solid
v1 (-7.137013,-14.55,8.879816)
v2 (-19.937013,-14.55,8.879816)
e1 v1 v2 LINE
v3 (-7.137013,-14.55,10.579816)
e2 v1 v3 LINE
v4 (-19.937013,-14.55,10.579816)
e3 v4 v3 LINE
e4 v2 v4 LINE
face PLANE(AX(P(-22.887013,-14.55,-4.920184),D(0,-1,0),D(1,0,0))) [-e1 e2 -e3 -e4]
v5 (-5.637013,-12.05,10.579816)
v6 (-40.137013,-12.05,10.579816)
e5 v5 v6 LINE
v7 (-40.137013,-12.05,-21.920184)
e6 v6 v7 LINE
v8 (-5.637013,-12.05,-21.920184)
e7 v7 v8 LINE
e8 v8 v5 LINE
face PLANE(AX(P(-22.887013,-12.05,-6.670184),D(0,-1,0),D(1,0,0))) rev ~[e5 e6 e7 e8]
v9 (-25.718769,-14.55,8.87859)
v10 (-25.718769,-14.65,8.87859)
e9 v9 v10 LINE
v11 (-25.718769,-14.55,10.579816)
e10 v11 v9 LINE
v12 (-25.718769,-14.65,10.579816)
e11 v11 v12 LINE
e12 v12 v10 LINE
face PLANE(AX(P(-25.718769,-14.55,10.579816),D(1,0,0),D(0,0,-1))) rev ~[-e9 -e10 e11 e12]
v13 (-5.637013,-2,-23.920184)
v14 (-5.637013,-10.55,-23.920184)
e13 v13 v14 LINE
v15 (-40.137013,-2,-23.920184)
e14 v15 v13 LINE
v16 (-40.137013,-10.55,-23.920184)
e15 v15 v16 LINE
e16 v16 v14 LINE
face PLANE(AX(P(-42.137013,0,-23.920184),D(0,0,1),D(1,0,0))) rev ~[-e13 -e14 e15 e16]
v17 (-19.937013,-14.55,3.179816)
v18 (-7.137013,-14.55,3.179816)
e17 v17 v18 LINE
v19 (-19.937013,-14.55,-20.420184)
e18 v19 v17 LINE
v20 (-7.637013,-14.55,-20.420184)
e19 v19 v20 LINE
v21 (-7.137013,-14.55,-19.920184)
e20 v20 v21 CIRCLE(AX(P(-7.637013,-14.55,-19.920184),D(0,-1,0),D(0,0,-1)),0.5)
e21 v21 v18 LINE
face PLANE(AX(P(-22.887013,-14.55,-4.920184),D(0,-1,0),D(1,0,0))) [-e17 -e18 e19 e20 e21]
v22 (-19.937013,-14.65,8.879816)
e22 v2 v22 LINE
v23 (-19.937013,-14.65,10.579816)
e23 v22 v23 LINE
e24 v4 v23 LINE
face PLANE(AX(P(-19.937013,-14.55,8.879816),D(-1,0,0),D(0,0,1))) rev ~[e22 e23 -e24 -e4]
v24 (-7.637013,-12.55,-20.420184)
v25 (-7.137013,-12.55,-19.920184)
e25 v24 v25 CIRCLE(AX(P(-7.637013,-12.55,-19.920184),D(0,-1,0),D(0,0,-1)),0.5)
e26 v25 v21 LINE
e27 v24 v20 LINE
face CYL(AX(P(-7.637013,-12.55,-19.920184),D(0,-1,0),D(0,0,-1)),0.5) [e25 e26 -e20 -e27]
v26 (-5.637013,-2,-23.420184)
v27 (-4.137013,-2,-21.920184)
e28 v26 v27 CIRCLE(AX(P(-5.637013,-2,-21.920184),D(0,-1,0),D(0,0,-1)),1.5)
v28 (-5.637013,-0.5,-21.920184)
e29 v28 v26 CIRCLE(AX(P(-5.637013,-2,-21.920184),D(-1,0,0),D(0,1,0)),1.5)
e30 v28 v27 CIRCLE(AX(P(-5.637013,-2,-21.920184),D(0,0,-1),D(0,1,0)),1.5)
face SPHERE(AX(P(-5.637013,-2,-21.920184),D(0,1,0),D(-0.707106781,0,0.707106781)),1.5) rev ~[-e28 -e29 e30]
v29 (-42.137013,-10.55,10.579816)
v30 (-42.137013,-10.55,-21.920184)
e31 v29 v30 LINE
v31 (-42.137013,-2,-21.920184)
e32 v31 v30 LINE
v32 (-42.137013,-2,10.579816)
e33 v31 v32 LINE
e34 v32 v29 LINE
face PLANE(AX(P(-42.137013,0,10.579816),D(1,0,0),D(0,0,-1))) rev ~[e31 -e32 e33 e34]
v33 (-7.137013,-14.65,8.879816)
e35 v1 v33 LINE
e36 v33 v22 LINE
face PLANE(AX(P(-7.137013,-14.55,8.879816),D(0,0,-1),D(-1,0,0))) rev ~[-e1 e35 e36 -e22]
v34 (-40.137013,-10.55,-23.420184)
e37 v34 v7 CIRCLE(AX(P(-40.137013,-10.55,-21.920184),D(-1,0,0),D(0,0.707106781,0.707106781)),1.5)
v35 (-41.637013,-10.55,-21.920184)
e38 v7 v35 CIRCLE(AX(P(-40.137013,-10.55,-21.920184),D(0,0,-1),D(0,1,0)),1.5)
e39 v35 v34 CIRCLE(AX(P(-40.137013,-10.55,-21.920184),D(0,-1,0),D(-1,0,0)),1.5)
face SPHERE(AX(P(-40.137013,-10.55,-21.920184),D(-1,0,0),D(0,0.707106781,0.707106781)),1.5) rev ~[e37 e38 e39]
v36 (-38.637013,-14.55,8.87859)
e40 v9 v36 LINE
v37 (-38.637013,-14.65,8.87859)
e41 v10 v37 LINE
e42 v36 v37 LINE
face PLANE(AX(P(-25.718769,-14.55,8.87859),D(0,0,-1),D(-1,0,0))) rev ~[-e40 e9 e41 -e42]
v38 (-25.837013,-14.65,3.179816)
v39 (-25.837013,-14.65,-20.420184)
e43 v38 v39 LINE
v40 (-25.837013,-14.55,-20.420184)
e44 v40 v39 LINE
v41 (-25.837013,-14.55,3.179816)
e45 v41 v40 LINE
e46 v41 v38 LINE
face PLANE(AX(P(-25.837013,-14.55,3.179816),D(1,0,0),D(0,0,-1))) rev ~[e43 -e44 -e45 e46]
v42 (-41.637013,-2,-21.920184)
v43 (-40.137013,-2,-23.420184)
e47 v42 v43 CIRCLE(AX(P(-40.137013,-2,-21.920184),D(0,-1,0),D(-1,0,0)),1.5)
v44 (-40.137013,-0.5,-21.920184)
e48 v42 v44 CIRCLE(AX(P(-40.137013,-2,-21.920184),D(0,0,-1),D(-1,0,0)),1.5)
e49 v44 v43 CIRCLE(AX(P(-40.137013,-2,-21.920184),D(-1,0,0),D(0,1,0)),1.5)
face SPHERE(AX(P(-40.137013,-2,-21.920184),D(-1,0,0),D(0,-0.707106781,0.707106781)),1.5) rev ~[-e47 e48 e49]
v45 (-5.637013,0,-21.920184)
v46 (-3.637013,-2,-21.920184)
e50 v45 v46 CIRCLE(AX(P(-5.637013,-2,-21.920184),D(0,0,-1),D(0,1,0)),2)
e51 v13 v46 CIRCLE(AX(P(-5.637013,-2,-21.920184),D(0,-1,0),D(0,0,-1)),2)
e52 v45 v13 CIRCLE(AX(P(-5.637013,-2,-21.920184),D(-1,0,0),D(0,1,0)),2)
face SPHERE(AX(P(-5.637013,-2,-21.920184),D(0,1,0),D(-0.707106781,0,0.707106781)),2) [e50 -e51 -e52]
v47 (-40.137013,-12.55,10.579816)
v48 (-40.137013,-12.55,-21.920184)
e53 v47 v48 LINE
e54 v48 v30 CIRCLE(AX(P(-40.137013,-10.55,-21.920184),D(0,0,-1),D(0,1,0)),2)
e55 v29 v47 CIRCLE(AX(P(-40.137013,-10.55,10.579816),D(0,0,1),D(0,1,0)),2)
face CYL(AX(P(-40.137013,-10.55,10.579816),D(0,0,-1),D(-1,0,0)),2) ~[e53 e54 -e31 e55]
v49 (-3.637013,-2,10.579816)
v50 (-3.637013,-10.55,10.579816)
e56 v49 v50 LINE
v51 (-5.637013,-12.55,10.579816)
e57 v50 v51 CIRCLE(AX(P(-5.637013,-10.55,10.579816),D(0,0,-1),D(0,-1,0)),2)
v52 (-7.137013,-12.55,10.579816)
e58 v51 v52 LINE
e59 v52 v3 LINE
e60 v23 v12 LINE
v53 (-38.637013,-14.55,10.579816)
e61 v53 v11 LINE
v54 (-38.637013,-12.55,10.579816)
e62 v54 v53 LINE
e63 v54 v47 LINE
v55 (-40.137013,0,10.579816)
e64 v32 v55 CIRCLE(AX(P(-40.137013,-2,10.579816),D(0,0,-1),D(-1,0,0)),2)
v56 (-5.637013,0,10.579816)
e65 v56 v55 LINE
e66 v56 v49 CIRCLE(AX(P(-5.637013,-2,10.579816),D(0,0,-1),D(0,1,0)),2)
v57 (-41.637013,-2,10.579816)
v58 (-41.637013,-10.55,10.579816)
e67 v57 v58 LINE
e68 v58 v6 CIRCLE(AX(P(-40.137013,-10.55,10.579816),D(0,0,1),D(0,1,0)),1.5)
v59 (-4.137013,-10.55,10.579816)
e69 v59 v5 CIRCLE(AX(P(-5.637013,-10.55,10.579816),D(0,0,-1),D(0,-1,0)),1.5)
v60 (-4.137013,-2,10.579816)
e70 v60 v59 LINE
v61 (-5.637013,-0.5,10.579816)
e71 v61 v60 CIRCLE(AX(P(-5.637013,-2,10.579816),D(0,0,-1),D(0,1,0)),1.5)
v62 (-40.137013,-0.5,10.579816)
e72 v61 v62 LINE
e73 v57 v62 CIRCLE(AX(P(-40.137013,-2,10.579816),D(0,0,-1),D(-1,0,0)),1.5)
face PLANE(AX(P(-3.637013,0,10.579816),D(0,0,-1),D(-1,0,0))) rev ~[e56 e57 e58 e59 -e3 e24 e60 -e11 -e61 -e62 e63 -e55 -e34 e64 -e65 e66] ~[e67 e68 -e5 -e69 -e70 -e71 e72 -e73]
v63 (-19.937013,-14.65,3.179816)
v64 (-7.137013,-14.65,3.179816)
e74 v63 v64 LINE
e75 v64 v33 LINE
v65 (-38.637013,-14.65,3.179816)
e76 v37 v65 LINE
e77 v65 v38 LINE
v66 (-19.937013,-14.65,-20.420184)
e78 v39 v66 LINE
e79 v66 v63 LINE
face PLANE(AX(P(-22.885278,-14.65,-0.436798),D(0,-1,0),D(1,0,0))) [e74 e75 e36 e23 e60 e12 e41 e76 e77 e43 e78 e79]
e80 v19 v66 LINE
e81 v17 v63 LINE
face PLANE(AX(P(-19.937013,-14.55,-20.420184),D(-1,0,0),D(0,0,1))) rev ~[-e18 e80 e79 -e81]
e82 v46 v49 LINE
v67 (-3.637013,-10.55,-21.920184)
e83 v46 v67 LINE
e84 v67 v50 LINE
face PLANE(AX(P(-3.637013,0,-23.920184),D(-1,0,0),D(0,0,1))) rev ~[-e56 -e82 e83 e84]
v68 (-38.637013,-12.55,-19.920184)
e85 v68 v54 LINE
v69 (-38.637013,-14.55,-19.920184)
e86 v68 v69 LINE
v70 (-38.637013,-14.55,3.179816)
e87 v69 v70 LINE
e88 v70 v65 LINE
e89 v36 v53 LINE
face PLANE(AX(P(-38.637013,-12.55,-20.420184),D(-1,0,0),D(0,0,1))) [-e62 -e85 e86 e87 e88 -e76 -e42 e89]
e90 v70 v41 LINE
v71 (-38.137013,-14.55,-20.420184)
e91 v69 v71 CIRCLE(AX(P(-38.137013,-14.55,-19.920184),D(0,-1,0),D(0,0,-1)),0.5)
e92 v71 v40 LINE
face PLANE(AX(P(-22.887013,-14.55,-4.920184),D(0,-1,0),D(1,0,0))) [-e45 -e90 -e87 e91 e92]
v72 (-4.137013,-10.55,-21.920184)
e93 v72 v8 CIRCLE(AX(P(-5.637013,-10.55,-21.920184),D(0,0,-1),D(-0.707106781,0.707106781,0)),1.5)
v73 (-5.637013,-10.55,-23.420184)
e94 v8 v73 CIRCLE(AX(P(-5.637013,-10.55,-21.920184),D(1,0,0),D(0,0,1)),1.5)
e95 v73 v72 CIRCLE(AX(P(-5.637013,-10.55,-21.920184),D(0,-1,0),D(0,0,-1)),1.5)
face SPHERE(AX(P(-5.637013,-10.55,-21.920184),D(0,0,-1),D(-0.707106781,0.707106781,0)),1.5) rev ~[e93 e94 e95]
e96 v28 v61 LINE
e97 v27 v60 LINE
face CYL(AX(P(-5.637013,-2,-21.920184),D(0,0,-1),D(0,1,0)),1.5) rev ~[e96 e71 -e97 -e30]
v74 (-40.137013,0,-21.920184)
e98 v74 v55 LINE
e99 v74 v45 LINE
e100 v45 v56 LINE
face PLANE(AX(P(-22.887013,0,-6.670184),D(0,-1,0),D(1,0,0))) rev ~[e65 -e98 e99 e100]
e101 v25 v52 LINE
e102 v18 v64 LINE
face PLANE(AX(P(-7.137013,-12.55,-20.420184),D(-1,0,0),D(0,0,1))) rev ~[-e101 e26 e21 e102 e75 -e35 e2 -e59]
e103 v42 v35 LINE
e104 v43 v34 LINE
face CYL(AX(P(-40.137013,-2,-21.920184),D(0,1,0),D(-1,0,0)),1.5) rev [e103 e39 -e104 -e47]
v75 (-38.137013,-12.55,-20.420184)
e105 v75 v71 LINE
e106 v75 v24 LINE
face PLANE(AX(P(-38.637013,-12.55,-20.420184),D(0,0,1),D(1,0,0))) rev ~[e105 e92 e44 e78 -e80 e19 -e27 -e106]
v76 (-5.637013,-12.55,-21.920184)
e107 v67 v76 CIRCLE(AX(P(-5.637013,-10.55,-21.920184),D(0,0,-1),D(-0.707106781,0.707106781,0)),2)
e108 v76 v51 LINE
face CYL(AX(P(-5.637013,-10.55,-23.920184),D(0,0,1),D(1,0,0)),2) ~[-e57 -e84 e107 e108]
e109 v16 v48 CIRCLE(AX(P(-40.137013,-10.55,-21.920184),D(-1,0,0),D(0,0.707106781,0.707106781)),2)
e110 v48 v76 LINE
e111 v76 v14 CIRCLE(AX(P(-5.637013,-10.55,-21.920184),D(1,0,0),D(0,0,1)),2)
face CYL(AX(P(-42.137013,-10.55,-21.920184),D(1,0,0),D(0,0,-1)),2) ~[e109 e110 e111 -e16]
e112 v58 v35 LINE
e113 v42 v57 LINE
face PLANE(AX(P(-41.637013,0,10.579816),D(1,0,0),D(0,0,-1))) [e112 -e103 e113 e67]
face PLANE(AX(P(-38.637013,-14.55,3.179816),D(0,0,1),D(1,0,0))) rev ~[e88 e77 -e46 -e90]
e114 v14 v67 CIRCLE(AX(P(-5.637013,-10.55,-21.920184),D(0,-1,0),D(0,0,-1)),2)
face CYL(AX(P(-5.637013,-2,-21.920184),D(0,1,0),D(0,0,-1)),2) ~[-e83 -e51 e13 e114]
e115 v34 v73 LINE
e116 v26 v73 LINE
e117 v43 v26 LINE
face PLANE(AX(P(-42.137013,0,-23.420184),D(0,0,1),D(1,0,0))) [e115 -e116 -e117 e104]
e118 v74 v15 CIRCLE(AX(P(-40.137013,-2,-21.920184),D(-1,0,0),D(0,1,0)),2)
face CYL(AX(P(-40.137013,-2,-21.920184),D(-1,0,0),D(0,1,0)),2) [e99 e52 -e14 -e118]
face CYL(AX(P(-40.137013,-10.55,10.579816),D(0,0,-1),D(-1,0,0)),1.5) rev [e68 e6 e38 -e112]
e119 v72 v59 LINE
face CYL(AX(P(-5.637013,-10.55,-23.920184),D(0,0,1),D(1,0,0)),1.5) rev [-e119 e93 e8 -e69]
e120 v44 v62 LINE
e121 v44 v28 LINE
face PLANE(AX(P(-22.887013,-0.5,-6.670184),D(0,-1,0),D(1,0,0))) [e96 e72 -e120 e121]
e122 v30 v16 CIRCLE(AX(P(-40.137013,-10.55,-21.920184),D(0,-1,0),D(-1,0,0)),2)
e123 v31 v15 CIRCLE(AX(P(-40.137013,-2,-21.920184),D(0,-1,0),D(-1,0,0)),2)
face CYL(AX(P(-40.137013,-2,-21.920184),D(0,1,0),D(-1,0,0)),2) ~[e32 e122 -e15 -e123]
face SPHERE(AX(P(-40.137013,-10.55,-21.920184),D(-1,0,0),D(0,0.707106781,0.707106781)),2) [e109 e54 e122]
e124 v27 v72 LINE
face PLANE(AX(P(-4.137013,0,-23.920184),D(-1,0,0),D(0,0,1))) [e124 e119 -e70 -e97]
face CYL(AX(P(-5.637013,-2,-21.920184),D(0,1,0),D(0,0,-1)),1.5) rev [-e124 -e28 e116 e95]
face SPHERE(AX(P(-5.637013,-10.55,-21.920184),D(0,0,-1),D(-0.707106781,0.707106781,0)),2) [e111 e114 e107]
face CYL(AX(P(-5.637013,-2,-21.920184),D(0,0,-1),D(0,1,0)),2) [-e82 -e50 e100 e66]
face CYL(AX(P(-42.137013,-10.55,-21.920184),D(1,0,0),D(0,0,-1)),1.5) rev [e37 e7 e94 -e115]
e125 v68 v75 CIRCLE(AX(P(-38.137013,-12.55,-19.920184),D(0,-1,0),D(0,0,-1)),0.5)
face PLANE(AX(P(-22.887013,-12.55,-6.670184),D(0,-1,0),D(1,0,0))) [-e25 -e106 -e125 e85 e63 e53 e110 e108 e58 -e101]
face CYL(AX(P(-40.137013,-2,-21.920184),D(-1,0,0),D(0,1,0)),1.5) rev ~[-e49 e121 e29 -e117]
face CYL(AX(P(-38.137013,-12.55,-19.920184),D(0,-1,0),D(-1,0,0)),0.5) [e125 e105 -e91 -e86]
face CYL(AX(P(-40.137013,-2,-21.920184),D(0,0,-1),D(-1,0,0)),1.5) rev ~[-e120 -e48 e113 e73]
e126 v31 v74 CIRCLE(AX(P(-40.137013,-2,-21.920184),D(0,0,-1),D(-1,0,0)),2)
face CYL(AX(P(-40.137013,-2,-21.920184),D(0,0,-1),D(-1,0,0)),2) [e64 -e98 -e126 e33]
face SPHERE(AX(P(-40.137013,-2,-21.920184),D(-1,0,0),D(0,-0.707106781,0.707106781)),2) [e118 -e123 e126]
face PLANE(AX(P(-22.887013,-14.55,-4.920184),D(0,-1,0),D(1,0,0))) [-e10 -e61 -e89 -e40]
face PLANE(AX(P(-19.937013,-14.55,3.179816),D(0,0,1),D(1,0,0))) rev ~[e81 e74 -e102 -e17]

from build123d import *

# Parameters (mm, degrees)
F1_DEPTH     = 12.55
F2_R         = 2
F3_T1_DEPTH  = 37.5
F3_T3_DEPTH  = 8.55
F3_T5_DEPTH  = 34.5
F3_S9_W      = 2
F3_S9_H      = 2
F3_T10_DEPTH = 2
F3_S15_W     = 2
F3_S15_H     = 2
F3_T16_DEPTH = 2
F3_S21_W     = 2
F3_S21_H     = 2
F3_T22_DEPTH = 2
F3_S27_W     = 2
F3_S27_H     = 2
F3_T28_DEPTH = 2
F4_T         = -0.5
F6_W         = 31.5
F6_H         = 31
F7_DEPTH     = 2
F8_R         = 0.5
F10_DEPTH    = 0.1


# Not quite as in the source:
# - a fillet or chamfer that OpenCascade refuses, or shapes differently, is made with other operations: its cross-section is extruded or revolved along the edge and cut away or added


with BuildPart() as f1:
    # F0 (on Front) → F1 (new body)
    with BuildSketch(Plane.XZ):
        Polygon((-42.1370128049, 10.5798164573), (-42.1370128049, -23.9201835427), (-3.6370128049, -23.9201835427), (-3.6370128049, 10.5798164573), (-8.2607226698, 10.5798164573), (-39.5151264966, 10.5798164573), (-39.6370128049, 10.5798164573), align=None)
    extrude(amount=F1_DEPTH)

    # F2
    f2_edges = [f1.edges().sort_by_distance(p)[0] for p in [
        (-42.137013, -12.55, -6.670184),
        (-22.887013, -12.55, -23.920184),
        (-3.637013, -12.55, -6.670184),
    ]]
    fillet(f2_edges, radius=F2_R)

    # F3: fillet of radius 2 on 5 edges, made by hand

    # F3_s2 → F3_t1 (cut)
    with BuildSketch(Plane.XY.offset(-21.9201835427)):
        with BuildLine():
            ThreePointArc((-42.1370128049, -2), (-41.5512263672, -0.5857864376), (-40.1370128049, 0))
            Line((-40.1370128049, 0), (-42.1370128049, 0))
            Line((-42.1370128049, 0), (-42.1370128049, -2))
        make_face()
        with BuildLine():
            ThreePointArc((-5.6370128049, 0), (-4.2227992425, -0.5857864376), (-3.6370128049, -2))
            Line((-3.6370128049, -2), (-3.6370128049, 0))
            Line((-3.6370128049, 0), (-5.6370128049, 0))
        make_face()
    extrude(amount=F3_T1_DEPTH, mode=Mode.SUBTRACT)

    # F3_s4 → F3_t3 (cut)
    with BuildSketch(Plane.XZ.offset(2)):
        with BuildLine():
            ThreePointArc((-5.6370128049, -23.9201835427), (-4.2227992425, -23.3343971051), (-3.6370128049, -21.9201835427))
            Line((-3.6370128049, -21.9201835427), (-3.6370128049, -23.9201835427))
            Line((-3.6370128049, -23.9201835427), (-5.6370128049, -23.9201835427))
        make_face()
        with BuildLine():
            ThreePointArc((-42.1370128049, -21.9201835427), (-41.5512263672, -23.3343971051), (-40.1370128049, -23.9201835427))
            Line((-40.1370128049, -23.9201835427), (-42.1370128049, -23.9201835427))
            Line((-42.1370128049, -23.9201835427), (-42.1370128049, -21.9201835427))
        make_face()
    extrude(amount=F3_T3_DEPTH, mode=Mode.SUBTRACT)

    # F3_s6 → F3_t5 (cut)
    with BuildSketch(Plane.YZ.offset(-40.1370128049)):
        with BuildLine():
            ThreePointArc((0, -21.9201835427), (-0.5857864376, -23.3343971051), (-2, -23.9201835427))
            Line((-2, -23.9201835427), (0, -23.9201835427))
            Line((0, -23.9201835427), (0, -21.9201835427))
        make_face()
    extrude(amount=F3_T5_DEPTH, mode=Mode.SUBTRACT)


with BuildPart() as f3_tool8:
    # F3_s9 → F3_t10 (new body)
    with BuildSketch(Plane.YZ.offset(-40.1370128049)):
        with Locations((-11.55, -22.9201835427)):
            Rectangle(F3_S9_W, F3_S9_H)
    extrude(amount=-F3_T10_DEPTH)

    # F3_s11 → F3_t12 (revolve, cut)
    with BuildSketch(Plane(origin=(-40.1370128049, -10.55, -21.9201835427), x_dir=(0, 0.7071067812, 0.7071067812), z_dir=(0, -0.7071067812, 0.7071067812))):
        with BuildLine():
            ThreePointArc((0, -2), (2, 0), (0, 2))
            Line((0, 2), (0, -2))
        make_face()
    revolve(axis=Axis((-40.1370128049, -10.55, -21.9201835427), (-1, 0, 0)), mode=Mode.SUBTRACT)


with BuildPart() as f1_1:
    add(f1.part)

    # F3_t7: cut F3_tool8
    add(f3_tool8.part, mode=Mode.SUBTRACT)


with BuildPart() as f3_tool14:
    # F3_s15 → F3_t16 (new body)
    with BuildSketch(Plane.XY.offset(-21.9201835427)):
        with Locations((-4.6370128049, -11.55)):
            Rectangle(F3_S15_W, F3_S15_H)
    extrude(amount=-F3_T16_DEPTH)

    # F3_s17 → F3_t18 (revolve, cut)
    with BuildSketch(Plane(origin=(-5.6370128049, -10.55, -21.9201835427), x_dir=(-0.7071067812, 0.7071067812, 0), z_dir=(-0.7071067812, -0.7071067812, 0))):
        with BuildLine():
            ThreePointArc((0, -2), (2, 0), (0, 2))
            Line((0, 2), (0, -2))
        make_face()
    revolve(axis=Axis((-5.6370128049, -10.55, -21.9201835427), (0, 0, -1)), mode=Mode.SUBTRACT)


with BuildPart() as f1_2:
    add(f1_1.part)

    # F3_t13: cut F3_tool14
    add(f3_tool14.part, mode=Mode.SUBTRACT)


with BuildPart() as f3_tool20:
    # F3_s21 → F3_t22 (new body)
    with BuildSketch(Plane.YZ.offset(-40.1370128049)):
        with Locations((-1, -22.9201835427)):
            Rectangle(F3_S21_W, F3_S21_H)
    extrude(amount=-F3_T22_DEPTH)

    # F3_s23 → F3_t24 (revolve, cut)
    with BuildSketch(Plane(origin=(-40.1370128049, -2, -21.9201835427), x_dir=(0, -0.7071067812, 0.7071067812), z_dir=(0, -0.7071067812, -0.7071067812))):
        with BuildLine():
            ThreePointArc((0, -2), (2, 0), (0, 2))
            Line((0, 2), (0, -2))
        make_face()
    revolve(axis=Axis((-40.1370128049, -2, -21.9201835427), (-1, 0, 0)), mode=Mode.SUBTRACT)


with BuildPart() as f1_3:
    add(f1_2.part)

    # F3_t19: cut F3_tool20
    add(f3_tool20.part, mode=Mode.SUBTRACT)


with BuildPart() as f3_tool26:
    # F3_s27 → F3_t28 (new body)
    with BuildSketch(Plane.XZ.offset(2)):
        with Locations((-4.6370128049, -22.9201835427)):
            Rectangle(F3_S27_W, F3_S27_H)
    extrude(amount=-F3_T28_DEPTH)

    # F3_s29 → F3_t30 (revolve, cut)
    with BuildSketch(Plane(origin=(-5.6370128049, -2, -21.9201835427), x_dir=(-0.7071067812, 0, 0.7071067812), z_dir=(-0.7071067812, 0, -0.7071067812))):
        with BuildLine():
            ThreePointArc((0, -2), (2, 0), (0, 2))
            Line((0, 2), (0, -2))
        make_face()
    revolve(axis=Axis((-5.6370128049, -2, -21.9201835427), (0, 1, 0)), mode=Mode.SUBTRACT)


with BuildPart() as f1_4:
    add(f1_3.part)

    # F3_t25: cut F3_tool26
    add(f3_tool26.part, mode=Mode.SUBTRACT)

    # F4
    f4_openings = [f1_4.faces().sort_by_distance(p)[0] for p in [
        (-22.887013, -6.275, 10.579816),
    ]]
    offset(amount=F4_T, openings=f4_openings)

    # F6 (on offset) → F7 (join)
    with BuildSketch(Plane.XZ.offset(12.55)):
        with Locations((-22.8870128049, -4.9201835427)):
            Rectangle(F6_W, F6_H)
    extrude(amount=F7_DEPTH)

    # F8
    f8_edges = [f1_4.edges().sort_by_distance(p)[0] for p in [
        (-38.637013, -13.55, -20.420184),
        (-7.137013, -13.55, -20.420184),
    ]]
    fillet(f8_edges, radius=F8_R)

    # F9 (on face) → F10 (join)
    with BuildSketch(Plane.XZ.offset(14.55)):
        Polygon((-25.7187689085, 8.8785898675), (-38.6370128049, 8.8785898675), (-38.6370128049, 3.1798164573), (-25.8370128049, 3.1798164573), (-25.8370128049, -20.4201835427), (-19.9370128049, -20.4201835427), (-19.9370128049, 3.1798164573), (-7.1370128049, 3.1798164573), (-7.1370128049, 8.8798164573), (-19.9370128049, 8.8798164573), (-19.9370128049, 10.5798164573), (-25.7187689085, 10.5798164573), align=None)
    extrude(amount=F10_DEPTH)


solid = f1_4.part
